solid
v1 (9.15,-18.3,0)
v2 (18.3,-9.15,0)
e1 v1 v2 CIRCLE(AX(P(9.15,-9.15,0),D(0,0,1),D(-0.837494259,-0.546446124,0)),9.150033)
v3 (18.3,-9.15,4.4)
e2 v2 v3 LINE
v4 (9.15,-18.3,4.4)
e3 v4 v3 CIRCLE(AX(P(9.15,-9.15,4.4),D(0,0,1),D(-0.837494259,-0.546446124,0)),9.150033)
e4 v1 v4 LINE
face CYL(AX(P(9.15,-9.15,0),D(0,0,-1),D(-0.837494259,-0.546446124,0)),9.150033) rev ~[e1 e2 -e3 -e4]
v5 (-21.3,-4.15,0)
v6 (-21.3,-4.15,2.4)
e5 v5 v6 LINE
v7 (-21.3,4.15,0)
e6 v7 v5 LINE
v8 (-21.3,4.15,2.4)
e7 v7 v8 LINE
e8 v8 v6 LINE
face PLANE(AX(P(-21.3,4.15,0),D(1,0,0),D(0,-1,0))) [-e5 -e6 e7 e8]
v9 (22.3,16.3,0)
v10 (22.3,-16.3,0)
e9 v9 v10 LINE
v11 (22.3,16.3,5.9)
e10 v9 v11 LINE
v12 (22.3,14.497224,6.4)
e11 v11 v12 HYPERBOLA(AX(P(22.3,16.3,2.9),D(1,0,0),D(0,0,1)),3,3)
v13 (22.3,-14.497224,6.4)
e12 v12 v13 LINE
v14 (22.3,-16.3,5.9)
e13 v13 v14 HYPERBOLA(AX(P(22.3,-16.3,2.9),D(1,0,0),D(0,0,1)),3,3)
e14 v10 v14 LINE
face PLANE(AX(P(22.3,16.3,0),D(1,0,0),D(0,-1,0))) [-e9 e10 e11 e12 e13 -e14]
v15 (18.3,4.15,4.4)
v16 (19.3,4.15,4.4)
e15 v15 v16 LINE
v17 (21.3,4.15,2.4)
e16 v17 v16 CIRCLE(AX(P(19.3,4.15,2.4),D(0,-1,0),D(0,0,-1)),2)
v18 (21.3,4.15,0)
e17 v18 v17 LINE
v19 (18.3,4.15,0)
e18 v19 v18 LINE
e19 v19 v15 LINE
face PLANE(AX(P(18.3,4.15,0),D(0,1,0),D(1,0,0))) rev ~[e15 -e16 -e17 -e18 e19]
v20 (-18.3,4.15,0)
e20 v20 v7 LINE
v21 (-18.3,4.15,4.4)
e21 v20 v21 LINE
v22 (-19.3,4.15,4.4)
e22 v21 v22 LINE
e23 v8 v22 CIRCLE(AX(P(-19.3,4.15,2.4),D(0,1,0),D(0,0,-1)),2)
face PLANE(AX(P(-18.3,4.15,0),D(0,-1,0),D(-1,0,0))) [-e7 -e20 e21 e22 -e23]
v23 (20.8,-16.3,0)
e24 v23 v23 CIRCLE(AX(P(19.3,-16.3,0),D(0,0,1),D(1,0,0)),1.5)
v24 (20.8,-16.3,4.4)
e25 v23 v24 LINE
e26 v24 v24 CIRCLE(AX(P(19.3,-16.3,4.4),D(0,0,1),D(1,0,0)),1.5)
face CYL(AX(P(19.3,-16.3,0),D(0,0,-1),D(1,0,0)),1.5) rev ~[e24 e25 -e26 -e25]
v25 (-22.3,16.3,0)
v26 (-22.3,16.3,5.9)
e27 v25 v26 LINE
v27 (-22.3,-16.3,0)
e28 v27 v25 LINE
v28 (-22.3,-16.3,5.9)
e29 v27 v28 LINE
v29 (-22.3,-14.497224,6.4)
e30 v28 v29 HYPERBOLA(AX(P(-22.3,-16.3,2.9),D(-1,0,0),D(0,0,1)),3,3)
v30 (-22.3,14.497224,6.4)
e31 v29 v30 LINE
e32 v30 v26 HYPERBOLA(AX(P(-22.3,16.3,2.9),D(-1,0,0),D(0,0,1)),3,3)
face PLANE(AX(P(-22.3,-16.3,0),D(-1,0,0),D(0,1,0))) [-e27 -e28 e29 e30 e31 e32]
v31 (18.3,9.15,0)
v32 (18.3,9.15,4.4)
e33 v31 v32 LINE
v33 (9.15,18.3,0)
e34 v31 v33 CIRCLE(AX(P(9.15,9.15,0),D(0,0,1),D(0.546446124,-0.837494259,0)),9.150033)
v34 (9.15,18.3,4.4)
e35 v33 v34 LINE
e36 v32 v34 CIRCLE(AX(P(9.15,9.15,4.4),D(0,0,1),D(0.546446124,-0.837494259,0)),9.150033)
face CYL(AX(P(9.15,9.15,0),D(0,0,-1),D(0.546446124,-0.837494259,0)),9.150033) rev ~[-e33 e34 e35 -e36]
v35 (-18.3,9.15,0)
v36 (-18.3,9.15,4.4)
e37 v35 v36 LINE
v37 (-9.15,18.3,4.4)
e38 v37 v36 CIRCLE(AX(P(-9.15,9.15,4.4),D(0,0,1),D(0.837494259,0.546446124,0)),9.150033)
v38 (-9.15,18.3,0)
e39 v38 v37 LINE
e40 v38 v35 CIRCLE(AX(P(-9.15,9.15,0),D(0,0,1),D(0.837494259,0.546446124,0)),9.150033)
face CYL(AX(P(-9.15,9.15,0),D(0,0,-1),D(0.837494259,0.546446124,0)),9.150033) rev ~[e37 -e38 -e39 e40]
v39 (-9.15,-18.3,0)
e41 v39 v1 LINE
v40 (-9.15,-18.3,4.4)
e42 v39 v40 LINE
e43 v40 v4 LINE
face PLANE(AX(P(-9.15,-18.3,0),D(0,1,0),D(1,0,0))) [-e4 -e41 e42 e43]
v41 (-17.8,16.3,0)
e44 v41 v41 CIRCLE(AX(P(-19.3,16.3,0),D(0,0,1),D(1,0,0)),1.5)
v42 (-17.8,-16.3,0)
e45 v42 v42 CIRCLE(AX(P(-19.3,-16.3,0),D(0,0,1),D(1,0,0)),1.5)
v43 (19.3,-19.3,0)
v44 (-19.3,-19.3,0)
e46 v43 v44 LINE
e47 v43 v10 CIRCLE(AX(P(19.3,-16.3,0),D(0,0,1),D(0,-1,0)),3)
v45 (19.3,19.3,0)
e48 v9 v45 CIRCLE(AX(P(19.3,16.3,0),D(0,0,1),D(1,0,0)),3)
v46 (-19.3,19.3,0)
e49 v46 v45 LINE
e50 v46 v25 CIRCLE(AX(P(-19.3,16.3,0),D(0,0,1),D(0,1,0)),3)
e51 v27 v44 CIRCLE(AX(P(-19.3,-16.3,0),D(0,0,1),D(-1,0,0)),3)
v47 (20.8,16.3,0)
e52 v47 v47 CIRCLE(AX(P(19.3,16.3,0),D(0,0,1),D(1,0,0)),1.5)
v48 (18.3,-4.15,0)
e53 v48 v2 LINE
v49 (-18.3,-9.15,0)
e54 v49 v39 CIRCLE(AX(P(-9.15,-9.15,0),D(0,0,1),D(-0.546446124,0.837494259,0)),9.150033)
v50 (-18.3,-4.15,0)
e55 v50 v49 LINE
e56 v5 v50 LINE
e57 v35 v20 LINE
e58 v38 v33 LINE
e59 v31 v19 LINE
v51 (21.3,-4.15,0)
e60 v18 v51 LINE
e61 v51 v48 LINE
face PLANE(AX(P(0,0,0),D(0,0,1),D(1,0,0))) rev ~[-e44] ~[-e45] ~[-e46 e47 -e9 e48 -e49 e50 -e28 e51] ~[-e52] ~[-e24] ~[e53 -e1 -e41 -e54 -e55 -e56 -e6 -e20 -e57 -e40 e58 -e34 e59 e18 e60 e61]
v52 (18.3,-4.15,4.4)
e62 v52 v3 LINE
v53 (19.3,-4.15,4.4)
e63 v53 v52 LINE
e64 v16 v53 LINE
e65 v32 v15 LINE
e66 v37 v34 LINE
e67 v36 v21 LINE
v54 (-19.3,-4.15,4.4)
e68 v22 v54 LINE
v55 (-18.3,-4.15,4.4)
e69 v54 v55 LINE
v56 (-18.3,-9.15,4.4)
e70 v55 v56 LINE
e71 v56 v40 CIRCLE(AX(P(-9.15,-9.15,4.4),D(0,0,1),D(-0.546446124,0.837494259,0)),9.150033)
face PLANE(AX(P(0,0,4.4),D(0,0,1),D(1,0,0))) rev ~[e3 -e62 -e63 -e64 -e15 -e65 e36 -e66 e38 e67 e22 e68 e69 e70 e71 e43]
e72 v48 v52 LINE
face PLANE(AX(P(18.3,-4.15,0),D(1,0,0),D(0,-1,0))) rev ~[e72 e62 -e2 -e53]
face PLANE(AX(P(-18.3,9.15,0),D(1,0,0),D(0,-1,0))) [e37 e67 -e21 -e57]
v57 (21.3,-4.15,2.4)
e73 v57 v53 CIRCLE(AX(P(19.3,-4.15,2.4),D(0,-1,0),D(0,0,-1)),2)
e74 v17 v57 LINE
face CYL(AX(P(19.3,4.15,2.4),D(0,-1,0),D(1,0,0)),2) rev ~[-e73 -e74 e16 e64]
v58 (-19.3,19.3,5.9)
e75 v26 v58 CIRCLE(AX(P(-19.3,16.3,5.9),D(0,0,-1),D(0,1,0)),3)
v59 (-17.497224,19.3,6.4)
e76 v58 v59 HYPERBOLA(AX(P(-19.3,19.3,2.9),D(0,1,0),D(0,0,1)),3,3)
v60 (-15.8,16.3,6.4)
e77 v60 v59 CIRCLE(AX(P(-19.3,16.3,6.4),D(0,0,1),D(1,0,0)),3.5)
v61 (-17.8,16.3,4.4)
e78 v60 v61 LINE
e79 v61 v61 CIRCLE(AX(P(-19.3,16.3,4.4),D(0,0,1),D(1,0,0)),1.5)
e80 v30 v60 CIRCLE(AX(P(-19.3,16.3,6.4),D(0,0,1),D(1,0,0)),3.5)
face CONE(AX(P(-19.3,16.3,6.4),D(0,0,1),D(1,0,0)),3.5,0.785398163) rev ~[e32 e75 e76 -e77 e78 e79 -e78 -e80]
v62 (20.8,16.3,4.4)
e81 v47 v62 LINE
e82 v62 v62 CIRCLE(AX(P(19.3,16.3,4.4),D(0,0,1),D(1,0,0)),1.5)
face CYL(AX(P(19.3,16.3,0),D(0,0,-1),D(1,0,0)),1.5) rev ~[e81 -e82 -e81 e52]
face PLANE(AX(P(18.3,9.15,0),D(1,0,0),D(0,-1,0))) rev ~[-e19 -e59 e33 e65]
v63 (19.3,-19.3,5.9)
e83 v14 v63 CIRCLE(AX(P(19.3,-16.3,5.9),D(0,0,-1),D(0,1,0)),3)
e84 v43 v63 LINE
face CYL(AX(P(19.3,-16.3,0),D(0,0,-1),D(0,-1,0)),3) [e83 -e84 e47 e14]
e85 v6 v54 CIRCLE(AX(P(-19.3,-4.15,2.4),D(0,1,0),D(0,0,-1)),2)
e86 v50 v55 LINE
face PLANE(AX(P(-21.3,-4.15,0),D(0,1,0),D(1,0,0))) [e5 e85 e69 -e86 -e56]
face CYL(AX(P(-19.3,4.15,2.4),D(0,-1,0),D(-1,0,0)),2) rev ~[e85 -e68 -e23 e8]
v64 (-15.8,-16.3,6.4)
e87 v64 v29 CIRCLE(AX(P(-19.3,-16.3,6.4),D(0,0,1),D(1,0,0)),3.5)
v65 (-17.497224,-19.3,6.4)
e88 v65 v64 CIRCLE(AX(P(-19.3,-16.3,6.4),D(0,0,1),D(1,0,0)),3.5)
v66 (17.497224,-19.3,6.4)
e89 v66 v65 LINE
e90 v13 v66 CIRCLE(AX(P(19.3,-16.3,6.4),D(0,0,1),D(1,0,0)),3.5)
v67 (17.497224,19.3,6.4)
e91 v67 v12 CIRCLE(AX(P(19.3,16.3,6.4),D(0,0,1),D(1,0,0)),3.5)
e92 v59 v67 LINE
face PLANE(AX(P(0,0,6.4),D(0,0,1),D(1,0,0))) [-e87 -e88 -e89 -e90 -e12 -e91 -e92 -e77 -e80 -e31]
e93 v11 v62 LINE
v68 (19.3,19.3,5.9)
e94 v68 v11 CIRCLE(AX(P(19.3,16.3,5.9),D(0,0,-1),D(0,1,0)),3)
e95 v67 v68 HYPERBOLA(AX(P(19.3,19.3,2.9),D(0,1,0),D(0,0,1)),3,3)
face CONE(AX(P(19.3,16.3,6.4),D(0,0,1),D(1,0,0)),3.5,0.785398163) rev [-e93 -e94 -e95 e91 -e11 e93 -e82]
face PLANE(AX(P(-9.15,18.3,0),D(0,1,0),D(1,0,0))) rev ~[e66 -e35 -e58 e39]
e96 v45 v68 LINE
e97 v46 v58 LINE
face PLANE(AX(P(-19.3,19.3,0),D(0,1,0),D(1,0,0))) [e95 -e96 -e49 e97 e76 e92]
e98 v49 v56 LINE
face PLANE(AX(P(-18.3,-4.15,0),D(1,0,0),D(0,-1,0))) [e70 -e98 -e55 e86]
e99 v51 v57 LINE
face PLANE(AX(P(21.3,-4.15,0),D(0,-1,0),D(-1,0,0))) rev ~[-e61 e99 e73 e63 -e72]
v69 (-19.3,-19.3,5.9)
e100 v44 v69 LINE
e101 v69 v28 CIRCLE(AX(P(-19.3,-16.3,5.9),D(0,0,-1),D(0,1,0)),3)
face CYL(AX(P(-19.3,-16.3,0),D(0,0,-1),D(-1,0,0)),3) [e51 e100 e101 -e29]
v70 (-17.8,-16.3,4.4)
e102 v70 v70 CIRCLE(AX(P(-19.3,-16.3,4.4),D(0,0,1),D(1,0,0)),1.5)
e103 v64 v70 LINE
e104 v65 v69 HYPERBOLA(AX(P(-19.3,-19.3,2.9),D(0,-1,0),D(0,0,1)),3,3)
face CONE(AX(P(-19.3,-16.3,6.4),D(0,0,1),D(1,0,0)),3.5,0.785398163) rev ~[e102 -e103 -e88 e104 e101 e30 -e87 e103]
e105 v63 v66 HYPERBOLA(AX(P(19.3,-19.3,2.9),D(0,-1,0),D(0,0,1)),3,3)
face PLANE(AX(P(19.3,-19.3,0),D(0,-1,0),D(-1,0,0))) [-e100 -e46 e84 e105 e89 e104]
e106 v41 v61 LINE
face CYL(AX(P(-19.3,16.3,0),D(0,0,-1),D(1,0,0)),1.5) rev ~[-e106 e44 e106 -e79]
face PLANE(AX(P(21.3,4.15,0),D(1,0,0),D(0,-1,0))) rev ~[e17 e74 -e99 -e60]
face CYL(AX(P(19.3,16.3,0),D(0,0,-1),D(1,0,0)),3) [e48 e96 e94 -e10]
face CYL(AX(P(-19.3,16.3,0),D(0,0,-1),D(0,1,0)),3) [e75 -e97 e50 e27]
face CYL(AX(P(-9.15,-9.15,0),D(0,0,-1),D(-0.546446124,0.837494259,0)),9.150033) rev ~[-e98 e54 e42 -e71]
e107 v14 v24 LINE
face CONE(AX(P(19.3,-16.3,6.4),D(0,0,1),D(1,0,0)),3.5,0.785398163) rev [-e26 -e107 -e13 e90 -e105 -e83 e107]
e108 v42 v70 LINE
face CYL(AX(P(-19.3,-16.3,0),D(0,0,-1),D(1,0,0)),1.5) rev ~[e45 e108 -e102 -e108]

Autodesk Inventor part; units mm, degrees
ref_plane "YZ Plane" through (0, 0, 0) normal (1, 0, 0) x (0, 1, 0)
ref_plane "XZ Plane" through (0, 0, 0) normal (0, 1, 0) x (-1, 0, 0)
ref_plane "XY Plane" through (0, 0, 0) normal (0, 0, 1) x (1, 0, 0)
sketch "Эскиз1" plane through (0, 0, 0) normal (0, 0, 1) x (1, 0, 0)
  arc A0 (19.3, -19.3) -> (22.3, -16.3) centre (19.3, -16.3) ccw
  line L0 (19.3, -19.3) -> (-19.3, -19.3)
  arc A1 (-22.3, -16.3) -> (-19.3, -19.3) centre (-19.3, -16.3) ccw
  line L1 (-22.3, -16.3) -> (-22.3, 16.3)
  arc A2 (-19.3, 19.3) -> (-22.3, 16.3) centre (-19.3, 16.3) ccw
  line L2 (-19.3, 19.3) -> (19.3, 19.3)
  arc A3 (22.3, 16.3) -> (19.3, 19.3) centre (19.3, 16.3) ccw
  line L3 (22.3, 16.3) -> (22.3, -16.3)
  circle A4 centre (-19.3, 16.3) radius 2 construction
  circle A5 centre (19.3, 16.3) radius 2 construction
  circle A6 centre (19.3, -16.3) radius 2 construction
  circle A7 centre (-19.3, -16.3) radius 2 construction
  arc A8 (14.15, 1.4869) -> (1.4869, 14.15) centre (9.15, 9.15) ccw
  line L4 (1.4869, 14.15) -> (-1.4869, 14.15)
  arc A9 (-1.4869, 14.15) -> (-14.15, 1.4869) centre (-9.15, 9.15) ccw
  line L5 (-14.15, 1.4869) -> (-14.15, -1.4869)
  arc A10 (-14.15, -1.4869) -> (-1.4869, -14.15) centre (-9.15, -9.15) ccw
  line L6 (-1.4869, -14.15) -> (1.4869, -14.15)
  arc A11 (1.4869, -14.15) -> (14.15, -1.4869) centre (9.15, -9.15) ccw
  line L7 (14.15, -1.4869) -> (14.15, 1.4869)
  line L8 (-9.15, 9.15) -> (-18.3, 9.15) construction
  line L9 (-22.3, 0) -> (22.3, 0) construction
  line L10 (0, 19.3) -> (0, -19.3) construction
  line L11 (-9.15, -9.15) -> (-18.3, -9.15) construction
  line L12 (-9.15, 9.15) -> (-9.15, 18.3) construction
  line L13 (9.15, 9.15) -> (9.15, 18.3) construction
  line L14 (-18.3, 9.15) -> (-18.3, -9.15)
  line L15 (-9.15, 18.3) -> (9.15, 18.3)
  line L16 (-9.15, -18.3) -> (9.15, -18.3)
  line L17 (18.3, 9.15) -> (18.3, -9.15)
  line L18 (-18.3, 9.15) -> (-18.3, 4.15) construction
  line L19 (-18.3, -9.15) -> (-18.3, -4.15) construction
  line L20 (-18.3, 4.15) -> (-21.3, 4.15)
  line L21 (-21.3, 4.15) -> (-21.3, -4.15)
  line L22 (-21.3, -4.15) -> (-18.3, -4.15)
  line L23 (-18.3, -4.15) -> (-18.3, 4.15)
  line L24 (18.3, 4.15) -> (21.3, 4.15)
  line L25 (21.3, 4.15) -> (21.3, -4.15)
  line L26 (21.3, -4.15) -> (18.3, -4.15)
  line L27 (18.3, -4.15) -> (18.3, 4.15)
  circle A12 centre (-19.3, 16.3) radius 1.5
  circle A13 centre (19.3, 16.3) radius 1.5
  circle A14 centre (19.3, -16.3) radius 1.5
  circle A15 centre (-19.3, -16.3) radius 1.5
  dimension "d0" = 5
  dimension "d1" = 5
  dimension "d2" = 3
  dimension "d3" = 8.3
  dimension "d4" = 3
  dimension "d5" = 3
  dimension "d6" = 3
  dimension "d7" = 3
extrude "Выдавливание1" add sketch "Эскиз1" along normal blind 6.4 contours L0 A1 L1 A2 L2 A3 L3 A0 | L7 A11 L6 A10 L5 A9 L4 A8 | A8 L17 A11 L7 | A8 L4 A9 L15 | L24 L25 L26 L17 | L16 A10 L6 A11 | A9 L5 A10 L14 | L14 L22 L21 L20
extrude "Выдавливание2" cut sketch "Эскиз1" along normal blind 4.4 contours L7 A11 L6 A10 L5 A9 L4 A8 | A8 L17 A11 L7 | A8 L4 A9 L15 | L24 L25 L26 L17 | L16 A10 L6 A11 | A9 L5 A10 L14 | L14 L22 L21 L20
chamfer "Фаска1" distance 2 angle 45 4 edges at (17.8, 16.3, 6.4) (17.8, -16.3, 6.4) (-20.8, -16.3, 6.4) (-20.8, 16.3, 6.4)
fillet "Сопряжение1" radius 2 2 edges at (-21.3, 0, 4.4) (21.3, 0, 4.4)
properties part number "akkum_cap_bms"
